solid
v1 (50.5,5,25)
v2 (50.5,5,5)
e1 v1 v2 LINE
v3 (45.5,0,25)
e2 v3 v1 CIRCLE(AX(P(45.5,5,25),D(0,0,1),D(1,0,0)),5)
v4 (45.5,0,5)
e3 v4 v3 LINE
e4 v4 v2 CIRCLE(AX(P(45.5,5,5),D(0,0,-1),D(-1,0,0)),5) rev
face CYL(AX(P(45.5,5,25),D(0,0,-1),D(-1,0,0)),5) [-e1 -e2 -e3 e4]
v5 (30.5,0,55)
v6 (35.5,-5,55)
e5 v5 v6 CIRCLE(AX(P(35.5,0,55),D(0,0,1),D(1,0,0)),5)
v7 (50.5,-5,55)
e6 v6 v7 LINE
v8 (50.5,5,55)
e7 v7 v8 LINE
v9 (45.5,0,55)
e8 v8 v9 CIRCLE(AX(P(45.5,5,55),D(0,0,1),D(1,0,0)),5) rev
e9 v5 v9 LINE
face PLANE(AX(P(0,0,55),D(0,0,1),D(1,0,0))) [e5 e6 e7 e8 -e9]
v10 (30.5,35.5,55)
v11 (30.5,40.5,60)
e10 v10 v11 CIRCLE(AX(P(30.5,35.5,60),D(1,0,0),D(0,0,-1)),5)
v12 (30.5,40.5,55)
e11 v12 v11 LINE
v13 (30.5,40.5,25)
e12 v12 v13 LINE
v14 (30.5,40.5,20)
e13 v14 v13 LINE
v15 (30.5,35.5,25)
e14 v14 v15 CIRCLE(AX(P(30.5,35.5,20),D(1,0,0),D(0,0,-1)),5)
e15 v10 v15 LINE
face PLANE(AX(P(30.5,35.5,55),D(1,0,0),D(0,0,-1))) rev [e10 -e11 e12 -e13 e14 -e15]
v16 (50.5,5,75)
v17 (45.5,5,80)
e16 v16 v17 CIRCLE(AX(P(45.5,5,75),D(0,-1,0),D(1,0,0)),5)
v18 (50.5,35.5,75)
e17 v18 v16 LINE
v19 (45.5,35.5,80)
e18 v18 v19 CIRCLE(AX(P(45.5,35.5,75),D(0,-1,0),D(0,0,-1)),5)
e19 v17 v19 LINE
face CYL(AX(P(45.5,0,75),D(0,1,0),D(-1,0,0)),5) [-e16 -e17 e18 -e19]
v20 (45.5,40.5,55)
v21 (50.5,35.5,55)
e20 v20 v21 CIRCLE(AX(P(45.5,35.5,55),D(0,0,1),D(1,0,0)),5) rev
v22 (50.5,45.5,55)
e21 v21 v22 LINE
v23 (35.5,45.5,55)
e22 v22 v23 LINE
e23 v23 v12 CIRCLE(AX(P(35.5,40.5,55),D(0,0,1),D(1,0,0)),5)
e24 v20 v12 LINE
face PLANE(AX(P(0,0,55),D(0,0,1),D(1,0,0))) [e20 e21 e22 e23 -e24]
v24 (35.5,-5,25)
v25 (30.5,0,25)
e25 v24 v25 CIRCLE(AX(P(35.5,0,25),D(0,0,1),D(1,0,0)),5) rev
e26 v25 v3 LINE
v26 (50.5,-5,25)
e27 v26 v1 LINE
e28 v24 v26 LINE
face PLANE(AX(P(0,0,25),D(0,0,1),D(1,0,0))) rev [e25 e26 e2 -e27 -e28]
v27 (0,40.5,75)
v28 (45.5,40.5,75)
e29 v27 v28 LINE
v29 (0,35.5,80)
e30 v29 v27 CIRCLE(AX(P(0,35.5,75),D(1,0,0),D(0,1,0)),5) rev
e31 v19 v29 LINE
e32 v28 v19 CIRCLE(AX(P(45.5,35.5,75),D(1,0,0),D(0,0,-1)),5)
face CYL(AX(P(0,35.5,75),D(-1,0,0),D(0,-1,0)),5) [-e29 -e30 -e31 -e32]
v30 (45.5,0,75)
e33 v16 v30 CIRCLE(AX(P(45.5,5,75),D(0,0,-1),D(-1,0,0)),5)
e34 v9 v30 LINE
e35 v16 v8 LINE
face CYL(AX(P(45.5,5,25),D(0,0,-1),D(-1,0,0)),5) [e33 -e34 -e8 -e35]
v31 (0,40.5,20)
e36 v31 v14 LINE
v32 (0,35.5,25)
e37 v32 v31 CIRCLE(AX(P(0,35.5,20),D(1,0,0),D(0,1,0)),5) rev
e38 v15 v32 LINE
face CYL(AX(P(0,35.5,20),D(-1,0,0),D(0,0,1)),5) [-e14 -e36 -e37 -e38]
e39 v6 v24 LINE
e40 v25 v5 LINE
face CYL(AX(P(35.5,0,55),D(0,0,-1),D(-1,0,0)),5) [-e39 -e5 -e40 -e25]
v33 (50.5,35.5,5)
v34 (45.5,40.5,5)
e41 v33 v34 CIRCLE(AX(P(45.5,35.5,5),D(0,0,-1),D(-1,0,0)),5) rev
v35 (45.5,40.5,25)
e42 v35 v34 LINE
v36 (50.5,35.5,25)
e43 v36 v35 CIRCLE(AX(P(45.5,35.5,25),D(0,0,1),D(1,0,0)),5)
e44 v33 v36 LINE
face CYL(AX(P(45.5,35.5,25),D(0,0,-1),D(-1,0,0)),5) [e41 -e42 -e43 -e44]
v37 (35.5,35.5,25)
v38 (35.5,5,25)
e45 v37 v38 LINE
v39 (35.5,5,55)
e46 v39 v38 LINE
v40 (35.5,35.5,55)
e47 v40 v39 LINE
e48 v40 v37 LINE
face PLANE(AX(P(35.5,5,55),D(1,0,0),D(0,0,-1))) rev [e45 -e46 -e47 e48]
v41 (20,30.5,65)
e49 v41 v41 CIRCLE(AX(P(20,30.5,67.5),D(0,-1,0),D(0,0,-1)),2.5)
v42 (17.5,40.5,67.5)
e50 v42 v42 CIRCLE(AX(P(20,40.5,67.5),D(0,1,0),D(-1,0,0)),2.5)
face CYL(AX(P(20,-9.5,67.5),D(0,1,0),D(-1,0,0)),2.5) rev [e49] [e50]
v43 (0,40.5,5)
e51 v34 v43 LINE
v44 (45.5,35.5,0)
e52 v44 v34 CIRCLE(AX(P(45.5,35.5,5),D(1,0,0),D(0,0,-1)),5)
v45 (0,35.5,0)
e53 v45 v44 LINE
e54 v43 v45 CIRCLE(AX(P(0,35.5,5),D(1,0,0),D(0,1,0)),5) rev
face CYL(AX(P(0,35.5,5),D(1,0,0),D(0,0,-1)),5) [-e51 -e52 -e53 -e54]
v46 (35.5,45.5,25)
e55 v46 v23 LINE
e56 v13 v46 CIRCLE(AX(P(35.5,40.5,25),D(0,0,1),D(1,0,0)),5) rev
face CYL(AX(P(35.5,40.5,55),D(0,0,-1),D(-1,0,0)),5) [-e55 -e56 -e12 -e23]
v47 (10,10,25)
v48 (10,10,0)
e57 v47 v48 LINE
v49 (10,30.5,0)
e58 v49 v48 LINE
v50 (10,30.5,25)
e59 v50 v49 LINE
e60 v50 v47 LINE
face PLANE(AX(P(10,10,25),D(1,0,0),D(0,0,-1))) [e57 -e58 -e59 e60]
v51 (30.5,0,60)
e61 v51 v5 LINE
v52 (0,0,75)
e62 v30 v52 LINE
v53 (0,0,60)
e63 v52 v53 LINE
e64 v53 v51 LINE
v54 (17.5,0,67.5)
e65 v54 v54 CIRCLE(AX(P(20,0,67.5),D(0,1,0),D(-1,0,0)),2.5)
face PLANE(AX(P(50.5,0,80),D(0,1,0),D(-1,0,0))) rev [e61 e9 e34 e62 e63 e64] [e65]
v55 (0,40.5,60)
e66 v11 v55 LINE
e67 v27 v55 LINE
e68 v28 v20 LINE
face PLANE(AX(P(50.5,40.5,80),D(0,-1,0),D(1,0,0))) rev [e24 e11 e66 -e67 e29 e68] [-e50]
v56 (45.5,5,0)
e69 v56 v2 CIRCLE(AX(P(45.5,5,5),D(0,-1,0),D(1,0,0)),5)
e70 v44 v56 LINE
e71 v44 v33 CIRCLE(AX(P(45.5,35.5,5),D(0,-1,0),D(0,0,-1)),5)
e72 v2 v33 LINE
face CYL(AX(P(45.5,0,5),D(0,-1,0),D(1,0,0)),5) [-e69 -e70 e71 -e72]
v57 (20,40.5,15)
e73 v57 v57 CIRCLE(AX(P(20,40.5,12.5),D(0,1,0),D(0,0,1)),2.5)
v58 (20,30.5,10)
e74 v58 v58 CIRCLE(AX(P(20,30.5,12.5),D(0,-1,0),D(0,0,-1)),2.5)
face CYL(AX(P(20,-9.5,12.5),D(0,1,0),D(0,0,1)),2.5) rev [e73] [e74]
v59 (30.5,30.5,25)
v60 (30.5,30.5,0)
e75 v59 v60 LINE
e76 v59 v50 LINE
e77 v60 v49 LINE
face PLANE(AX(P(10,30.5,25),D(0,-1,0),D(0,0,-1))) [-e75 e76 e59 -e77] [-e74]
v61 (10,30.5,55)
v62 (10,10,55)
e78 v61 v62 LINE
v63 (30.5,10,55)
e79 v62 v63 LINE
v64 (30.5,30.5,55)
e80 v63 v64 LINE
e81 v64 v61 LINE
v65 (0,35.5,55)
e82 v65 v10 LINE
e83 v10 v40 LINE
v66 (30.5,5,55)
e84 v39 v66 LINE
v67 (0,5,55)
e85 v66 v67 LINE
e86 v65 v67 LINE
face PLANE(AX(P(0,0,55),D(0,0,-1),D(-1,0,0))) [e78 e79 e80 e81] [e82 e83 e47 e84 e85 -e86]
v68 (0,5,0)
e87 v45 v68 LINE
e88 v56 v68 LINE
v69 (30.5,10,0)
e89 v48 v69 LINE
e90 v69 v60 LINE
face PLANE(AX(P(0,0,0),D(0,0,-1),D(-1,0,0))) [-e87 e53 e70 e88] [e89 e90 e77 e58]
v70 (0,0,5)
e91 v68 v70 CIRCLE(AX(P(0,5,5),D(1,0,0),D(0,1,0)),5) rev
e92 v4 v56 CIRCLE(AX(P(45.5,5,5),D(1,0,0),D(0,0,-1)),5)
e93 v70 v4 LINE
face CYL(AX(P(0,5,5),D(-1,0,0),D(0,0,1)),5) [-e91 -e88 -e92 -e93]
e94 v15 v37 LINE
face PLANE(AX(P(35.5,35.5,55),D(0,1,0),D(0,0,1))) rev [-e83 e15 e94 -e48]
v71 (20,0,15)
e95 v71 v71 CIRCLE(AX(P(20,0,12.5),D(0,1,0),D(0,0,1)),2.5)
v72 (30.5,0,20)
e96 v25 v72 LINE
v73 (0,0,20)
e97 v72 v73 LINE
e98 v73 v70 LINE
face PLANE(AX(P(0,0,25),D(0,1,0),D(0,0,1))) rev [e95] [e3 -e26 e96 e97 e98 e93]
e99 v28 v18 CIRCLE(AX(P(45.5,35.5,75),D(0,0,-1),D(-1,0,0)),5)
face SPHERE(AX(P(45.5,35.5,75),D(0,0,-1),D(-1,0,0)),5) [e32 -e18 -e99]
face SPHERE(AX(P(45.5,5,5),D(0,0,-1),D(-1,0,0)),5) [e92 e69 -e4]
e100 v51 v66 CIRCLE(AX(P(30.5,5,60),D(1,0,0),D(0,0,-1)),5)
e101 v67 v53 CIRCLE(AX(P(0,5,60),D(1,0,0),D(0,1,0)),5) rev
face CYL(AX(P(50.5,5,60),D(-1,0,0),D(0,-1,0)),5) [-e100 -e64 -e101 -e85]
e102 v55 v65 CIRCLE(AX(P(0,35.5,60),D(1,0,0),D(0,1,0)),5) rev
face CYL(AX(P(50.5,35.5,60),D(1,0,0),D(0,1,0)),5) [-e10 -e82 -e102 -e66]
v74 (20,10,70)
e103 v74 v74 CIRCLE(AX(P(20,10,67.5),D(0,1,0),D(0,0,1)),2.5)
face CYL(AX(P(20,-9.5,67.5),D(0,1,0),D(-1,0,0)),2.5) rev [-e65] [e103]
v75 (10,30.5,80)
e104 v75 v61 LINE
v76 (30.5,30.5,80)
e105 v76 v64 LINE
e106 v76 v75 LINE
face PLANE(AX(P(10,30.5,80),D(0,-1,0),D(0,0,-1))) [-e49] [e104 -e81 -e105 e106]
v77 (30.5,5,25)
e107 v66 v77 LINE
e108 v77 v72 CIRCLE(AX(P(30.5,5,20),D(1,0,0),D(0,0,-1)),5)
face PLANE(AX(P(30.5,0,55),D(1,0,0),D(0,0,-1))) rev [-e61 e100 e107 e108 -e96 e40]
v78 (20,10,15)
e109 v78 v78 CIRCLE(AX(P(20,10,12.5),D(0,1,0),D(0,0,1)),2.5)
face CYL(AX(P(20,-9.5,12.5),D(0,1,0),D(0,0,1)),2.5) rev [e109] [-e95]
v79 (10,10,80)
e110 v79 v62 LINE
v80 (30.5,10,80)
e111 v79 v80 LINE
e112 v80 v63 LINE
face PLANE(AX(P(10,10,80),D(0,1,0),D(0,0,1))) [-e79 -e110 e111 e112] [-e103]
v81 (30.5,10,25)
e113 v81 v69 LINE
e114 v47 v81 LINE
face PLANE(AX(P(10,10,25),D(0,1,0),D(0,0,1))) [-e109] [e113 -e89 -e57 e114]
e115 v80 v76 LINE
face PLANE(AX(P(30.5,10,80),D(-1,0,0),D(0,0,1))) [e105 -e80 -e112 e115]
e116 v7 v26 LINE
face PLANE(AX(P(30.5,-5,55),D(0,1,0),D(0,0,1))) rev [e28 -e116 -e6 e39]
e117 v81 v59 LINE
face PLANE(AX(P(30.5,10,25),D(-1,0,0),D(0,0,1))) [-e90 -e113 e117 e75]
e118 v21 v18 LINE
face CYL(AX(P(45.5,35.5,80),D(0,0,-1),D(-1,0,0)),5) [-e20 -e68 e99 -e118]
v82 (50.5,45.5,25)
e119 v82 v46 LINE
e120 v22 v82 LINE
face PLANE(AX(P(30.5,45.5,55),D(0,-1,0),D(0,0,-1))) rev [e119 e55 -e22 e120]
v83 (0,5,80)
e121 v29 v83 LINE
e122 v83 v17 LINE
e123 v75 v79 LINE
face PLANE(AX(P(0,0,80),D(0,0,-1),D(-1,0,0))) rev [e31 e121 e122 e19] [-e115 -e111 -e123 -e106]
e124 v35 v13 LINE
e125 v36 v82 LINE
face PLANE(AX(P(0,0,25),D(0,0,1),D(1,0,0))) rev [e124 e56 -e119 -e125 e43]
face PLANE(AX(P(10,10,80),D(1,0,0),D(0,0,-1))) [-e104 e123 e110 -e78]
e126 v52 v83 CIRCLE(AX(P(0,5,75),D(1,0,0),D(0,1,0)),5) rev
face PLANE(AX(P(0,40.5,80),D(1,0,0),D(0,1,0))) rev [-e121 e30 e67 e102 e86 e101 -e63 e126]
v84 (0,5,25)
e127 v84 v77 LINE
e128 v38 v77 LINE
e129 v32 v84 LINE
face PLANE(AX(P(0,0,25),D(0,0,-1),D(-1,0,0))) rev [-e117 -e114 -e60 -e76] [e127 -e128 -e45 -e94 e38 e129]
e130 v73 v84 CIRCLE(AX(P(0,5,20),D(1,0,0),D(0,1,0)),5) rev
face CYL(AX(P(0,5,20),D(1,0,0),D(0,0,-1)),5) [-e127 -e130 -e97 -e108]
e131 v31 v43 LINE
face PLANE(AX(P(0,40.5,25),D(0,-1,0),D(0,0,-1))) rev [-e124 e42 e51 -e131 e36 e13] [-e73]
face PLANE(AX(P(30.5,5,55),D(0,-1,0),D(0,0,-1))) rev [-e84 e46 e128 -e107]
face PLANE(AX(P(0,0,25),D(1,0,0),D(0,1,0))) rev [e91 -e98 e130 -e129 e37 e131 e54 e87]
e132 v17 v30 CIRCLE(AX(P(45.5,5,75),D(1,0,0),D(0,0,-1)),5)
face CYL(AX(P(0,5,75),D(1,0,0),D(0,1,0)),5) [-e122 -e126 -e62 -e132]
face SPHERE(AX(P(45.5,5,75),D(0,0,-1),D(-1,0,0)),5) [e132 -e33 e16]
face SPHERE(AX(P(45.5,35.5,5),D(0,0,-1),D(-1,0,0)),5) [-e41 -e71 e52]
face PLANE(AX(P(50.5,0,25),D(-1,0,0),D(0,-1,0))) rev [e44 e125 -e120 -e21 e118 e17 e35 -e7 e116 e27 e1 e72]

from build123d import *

# Parameters (mm, degrees)
SKETCH2_W           = 50.5
SKETCH2_H           = 40.5
SKETCH2_W_2         = 20.5
SKETCH2_H_2         = 20.5
BOSS_EXTRUDE3_DEPTH = 25
BOSS_EXTRUDE5_DEPTH = 30
SKETCH6_W           = 50.5
SKETCH6_H           = 40.5
SKETCH6_W_2         = 20.5
SKETCH6_H_2         = 20.5
BOSS_EXTRUDE6_DEPTH = 25
FILLET6_R           = 5
FILLET8_R           = 5
FILLET10_R          = 5
HOLE1_OUTLINE_R     = 2.5
HOLE1_DEPTH         = 40.5
HOLE2_OUTLINE_R     = 2.5
HOLE2_DEPTH         = 40.5
FILLET11_R          = 5


# Read off the part's stored shape, not the designer's step: Hole1, Hole2
with BuildPart() as part:
    # Sketch2 → Boss-Extrude3 (new body)
    with BuildSketch(Plane.XY):
        with Locations((25.25, 20.25)):
            Rectangle(SKETCH2_W, SKETCH2_H)
        with Locations((20.25, 20.25)):
            Rectangle(SKETCH2_W_2, SKETCH2_H_2, mode=Mode.SUBTRACT)
    extrude(amount=BOSS_EXTRUDE3_DEPTH)

    # Sketch5 → Boss-Extrude5 (add)
    with BuildSketch(Plane.XY.offset(25)):
        Polygon((50.5, 40.5), (50.5, 0), (50.5, -5), (30.5, -5), (30.5, 0), (30.5, 5), (35.5, 5), (35.5, 35.5), (30.5, 35.5), (30.5, 40.5), (30.5, 45.5), (50.5, 45.5), align=None)
    extrude(amount=BOSS_EXTRUDE5_DEPTH)

    # Sketch6 → Boss-Extrude6 (add)
    with BuildSketch(Plane.XY.offset(55)):
        with Locations((25.25, 20.25)):
            Rectangle(SKETCH6_W, SKETCH6_H)
        with Locations((20.25, 20.25)):
            Rectangle(SKETCH6_W_2, SKETCH6_H_2, mode=Mode.SUBTRACT)
    extrude(amount=BOSS_EXTRUDE6_DEPTH)

    # Fillet6
    fillet6_edges = [part.edges().sort_by_distance(p)[0] for p in [
        (50.5, 0, 67.5),
        (50.5, 40.5, 67.5),
        (50.5, 40.5, 12.5),
        (50.5, 0, 12.5),
    ]]
    fillet(fillet6_edges, radius=FILLET6_R)

    # Fillet8
    fillet8_edges = [part.edges().sort_by_distance(p)[0] for p in [
        (22.75, 0, 0),
        (22.75, 0, 80),
        (50.5, 20.25, 0),
        (50.5, 20.25, 80),
        (22.75, 40.5, 80),
        (49.035533906, 39.035533906, 80),
        (49.035533906, 1.464466094, 80),
        (22.75, 40.5, 0),
        (49.035533906, 39.035533906, 0),
        (49.035533906, 1.464466094, 0),
    ]]
    fillet(fillet8_edges, radius=FILLET8_R)

    # Fillet10
    # the kernel refuses this fillet: 5 mm, written as the material it takes off along each edge
    with BuildSketch(Plane(origin=(-12.5, 0, 25), x_dir=(0, 0, -1), z_dir=(1, 0, 0)), Plane(origin=(-12.5, 0, 55), x_dir=(0, 1, 0), z_dir=(1, 0, 0)), Plane(origin=(30.5, 40.5, 55), x_dir=(0, -1, 0), z_dir=(-1, 0, 0))) as fillet10_piece_1:
        with BuildLine():
            CenterArc((FILLET10_R, FILLET10_R), FILLET10_R, 180, 90)
            Line((0, FILLET10_R), (0, 0))
            Line((0, 0), (FILLET10_R, 0))
        make_face()
    extrude(amount=43, mode=Mode.SUBTRACT)
    with BuildSketch(Plane(origin=(30.5, 40.5, 25), x_dir=(0, -1, 0), z_dir=(-1, 0, 0))) as fillet10_piece_2:
        with BuildLine():
            CenterArc((FILLET10_R, -FILLET10_R), FILLET10_R, 90, 90)
            Line((0, -FILLET10_R), (0, 0))
            Line((0, 0), (FILLET10_R, 0))
        make_face()
    extrude(amount=43, mode=Mode.SUBTRACT)

    # Hole1 outline → Hole1 (cut)
    with BuildSketch(Plane(origin=(0, 0, 0), x_dir=(1, 0, 0), z_dir=(0, 1, 0))):
        with Locations((20, -67.5)):
            Circle(HOLE1_OUTLINE_R)
    extrude(amount=HOLE1_DEPTH, mode=Mode.SUBTRACT)

    # Hole2 outline → Hole2 (cut)
    with BuildSketch(Plane(origin=(0, 0, 0), x_dir=(1, 0, 0), z_dir=(0, 1, 0))):
        with Locations((20, -12.5)):
            Circle(HOLE2_OUTLINE_R)
    extrude(amount=HOLE2_DEPTH, mode=Mode.SUBTRACT)

    # Fillet11
    fillet11_edges = [part.edges().sort_by_distance(p)[0] for p in [
        (30.5, -5, 40),
        (30.5, 45.5, 40),
    ]]
    fillet(fillet11_edges, radius=FILLET11_R)


solid = part.part
